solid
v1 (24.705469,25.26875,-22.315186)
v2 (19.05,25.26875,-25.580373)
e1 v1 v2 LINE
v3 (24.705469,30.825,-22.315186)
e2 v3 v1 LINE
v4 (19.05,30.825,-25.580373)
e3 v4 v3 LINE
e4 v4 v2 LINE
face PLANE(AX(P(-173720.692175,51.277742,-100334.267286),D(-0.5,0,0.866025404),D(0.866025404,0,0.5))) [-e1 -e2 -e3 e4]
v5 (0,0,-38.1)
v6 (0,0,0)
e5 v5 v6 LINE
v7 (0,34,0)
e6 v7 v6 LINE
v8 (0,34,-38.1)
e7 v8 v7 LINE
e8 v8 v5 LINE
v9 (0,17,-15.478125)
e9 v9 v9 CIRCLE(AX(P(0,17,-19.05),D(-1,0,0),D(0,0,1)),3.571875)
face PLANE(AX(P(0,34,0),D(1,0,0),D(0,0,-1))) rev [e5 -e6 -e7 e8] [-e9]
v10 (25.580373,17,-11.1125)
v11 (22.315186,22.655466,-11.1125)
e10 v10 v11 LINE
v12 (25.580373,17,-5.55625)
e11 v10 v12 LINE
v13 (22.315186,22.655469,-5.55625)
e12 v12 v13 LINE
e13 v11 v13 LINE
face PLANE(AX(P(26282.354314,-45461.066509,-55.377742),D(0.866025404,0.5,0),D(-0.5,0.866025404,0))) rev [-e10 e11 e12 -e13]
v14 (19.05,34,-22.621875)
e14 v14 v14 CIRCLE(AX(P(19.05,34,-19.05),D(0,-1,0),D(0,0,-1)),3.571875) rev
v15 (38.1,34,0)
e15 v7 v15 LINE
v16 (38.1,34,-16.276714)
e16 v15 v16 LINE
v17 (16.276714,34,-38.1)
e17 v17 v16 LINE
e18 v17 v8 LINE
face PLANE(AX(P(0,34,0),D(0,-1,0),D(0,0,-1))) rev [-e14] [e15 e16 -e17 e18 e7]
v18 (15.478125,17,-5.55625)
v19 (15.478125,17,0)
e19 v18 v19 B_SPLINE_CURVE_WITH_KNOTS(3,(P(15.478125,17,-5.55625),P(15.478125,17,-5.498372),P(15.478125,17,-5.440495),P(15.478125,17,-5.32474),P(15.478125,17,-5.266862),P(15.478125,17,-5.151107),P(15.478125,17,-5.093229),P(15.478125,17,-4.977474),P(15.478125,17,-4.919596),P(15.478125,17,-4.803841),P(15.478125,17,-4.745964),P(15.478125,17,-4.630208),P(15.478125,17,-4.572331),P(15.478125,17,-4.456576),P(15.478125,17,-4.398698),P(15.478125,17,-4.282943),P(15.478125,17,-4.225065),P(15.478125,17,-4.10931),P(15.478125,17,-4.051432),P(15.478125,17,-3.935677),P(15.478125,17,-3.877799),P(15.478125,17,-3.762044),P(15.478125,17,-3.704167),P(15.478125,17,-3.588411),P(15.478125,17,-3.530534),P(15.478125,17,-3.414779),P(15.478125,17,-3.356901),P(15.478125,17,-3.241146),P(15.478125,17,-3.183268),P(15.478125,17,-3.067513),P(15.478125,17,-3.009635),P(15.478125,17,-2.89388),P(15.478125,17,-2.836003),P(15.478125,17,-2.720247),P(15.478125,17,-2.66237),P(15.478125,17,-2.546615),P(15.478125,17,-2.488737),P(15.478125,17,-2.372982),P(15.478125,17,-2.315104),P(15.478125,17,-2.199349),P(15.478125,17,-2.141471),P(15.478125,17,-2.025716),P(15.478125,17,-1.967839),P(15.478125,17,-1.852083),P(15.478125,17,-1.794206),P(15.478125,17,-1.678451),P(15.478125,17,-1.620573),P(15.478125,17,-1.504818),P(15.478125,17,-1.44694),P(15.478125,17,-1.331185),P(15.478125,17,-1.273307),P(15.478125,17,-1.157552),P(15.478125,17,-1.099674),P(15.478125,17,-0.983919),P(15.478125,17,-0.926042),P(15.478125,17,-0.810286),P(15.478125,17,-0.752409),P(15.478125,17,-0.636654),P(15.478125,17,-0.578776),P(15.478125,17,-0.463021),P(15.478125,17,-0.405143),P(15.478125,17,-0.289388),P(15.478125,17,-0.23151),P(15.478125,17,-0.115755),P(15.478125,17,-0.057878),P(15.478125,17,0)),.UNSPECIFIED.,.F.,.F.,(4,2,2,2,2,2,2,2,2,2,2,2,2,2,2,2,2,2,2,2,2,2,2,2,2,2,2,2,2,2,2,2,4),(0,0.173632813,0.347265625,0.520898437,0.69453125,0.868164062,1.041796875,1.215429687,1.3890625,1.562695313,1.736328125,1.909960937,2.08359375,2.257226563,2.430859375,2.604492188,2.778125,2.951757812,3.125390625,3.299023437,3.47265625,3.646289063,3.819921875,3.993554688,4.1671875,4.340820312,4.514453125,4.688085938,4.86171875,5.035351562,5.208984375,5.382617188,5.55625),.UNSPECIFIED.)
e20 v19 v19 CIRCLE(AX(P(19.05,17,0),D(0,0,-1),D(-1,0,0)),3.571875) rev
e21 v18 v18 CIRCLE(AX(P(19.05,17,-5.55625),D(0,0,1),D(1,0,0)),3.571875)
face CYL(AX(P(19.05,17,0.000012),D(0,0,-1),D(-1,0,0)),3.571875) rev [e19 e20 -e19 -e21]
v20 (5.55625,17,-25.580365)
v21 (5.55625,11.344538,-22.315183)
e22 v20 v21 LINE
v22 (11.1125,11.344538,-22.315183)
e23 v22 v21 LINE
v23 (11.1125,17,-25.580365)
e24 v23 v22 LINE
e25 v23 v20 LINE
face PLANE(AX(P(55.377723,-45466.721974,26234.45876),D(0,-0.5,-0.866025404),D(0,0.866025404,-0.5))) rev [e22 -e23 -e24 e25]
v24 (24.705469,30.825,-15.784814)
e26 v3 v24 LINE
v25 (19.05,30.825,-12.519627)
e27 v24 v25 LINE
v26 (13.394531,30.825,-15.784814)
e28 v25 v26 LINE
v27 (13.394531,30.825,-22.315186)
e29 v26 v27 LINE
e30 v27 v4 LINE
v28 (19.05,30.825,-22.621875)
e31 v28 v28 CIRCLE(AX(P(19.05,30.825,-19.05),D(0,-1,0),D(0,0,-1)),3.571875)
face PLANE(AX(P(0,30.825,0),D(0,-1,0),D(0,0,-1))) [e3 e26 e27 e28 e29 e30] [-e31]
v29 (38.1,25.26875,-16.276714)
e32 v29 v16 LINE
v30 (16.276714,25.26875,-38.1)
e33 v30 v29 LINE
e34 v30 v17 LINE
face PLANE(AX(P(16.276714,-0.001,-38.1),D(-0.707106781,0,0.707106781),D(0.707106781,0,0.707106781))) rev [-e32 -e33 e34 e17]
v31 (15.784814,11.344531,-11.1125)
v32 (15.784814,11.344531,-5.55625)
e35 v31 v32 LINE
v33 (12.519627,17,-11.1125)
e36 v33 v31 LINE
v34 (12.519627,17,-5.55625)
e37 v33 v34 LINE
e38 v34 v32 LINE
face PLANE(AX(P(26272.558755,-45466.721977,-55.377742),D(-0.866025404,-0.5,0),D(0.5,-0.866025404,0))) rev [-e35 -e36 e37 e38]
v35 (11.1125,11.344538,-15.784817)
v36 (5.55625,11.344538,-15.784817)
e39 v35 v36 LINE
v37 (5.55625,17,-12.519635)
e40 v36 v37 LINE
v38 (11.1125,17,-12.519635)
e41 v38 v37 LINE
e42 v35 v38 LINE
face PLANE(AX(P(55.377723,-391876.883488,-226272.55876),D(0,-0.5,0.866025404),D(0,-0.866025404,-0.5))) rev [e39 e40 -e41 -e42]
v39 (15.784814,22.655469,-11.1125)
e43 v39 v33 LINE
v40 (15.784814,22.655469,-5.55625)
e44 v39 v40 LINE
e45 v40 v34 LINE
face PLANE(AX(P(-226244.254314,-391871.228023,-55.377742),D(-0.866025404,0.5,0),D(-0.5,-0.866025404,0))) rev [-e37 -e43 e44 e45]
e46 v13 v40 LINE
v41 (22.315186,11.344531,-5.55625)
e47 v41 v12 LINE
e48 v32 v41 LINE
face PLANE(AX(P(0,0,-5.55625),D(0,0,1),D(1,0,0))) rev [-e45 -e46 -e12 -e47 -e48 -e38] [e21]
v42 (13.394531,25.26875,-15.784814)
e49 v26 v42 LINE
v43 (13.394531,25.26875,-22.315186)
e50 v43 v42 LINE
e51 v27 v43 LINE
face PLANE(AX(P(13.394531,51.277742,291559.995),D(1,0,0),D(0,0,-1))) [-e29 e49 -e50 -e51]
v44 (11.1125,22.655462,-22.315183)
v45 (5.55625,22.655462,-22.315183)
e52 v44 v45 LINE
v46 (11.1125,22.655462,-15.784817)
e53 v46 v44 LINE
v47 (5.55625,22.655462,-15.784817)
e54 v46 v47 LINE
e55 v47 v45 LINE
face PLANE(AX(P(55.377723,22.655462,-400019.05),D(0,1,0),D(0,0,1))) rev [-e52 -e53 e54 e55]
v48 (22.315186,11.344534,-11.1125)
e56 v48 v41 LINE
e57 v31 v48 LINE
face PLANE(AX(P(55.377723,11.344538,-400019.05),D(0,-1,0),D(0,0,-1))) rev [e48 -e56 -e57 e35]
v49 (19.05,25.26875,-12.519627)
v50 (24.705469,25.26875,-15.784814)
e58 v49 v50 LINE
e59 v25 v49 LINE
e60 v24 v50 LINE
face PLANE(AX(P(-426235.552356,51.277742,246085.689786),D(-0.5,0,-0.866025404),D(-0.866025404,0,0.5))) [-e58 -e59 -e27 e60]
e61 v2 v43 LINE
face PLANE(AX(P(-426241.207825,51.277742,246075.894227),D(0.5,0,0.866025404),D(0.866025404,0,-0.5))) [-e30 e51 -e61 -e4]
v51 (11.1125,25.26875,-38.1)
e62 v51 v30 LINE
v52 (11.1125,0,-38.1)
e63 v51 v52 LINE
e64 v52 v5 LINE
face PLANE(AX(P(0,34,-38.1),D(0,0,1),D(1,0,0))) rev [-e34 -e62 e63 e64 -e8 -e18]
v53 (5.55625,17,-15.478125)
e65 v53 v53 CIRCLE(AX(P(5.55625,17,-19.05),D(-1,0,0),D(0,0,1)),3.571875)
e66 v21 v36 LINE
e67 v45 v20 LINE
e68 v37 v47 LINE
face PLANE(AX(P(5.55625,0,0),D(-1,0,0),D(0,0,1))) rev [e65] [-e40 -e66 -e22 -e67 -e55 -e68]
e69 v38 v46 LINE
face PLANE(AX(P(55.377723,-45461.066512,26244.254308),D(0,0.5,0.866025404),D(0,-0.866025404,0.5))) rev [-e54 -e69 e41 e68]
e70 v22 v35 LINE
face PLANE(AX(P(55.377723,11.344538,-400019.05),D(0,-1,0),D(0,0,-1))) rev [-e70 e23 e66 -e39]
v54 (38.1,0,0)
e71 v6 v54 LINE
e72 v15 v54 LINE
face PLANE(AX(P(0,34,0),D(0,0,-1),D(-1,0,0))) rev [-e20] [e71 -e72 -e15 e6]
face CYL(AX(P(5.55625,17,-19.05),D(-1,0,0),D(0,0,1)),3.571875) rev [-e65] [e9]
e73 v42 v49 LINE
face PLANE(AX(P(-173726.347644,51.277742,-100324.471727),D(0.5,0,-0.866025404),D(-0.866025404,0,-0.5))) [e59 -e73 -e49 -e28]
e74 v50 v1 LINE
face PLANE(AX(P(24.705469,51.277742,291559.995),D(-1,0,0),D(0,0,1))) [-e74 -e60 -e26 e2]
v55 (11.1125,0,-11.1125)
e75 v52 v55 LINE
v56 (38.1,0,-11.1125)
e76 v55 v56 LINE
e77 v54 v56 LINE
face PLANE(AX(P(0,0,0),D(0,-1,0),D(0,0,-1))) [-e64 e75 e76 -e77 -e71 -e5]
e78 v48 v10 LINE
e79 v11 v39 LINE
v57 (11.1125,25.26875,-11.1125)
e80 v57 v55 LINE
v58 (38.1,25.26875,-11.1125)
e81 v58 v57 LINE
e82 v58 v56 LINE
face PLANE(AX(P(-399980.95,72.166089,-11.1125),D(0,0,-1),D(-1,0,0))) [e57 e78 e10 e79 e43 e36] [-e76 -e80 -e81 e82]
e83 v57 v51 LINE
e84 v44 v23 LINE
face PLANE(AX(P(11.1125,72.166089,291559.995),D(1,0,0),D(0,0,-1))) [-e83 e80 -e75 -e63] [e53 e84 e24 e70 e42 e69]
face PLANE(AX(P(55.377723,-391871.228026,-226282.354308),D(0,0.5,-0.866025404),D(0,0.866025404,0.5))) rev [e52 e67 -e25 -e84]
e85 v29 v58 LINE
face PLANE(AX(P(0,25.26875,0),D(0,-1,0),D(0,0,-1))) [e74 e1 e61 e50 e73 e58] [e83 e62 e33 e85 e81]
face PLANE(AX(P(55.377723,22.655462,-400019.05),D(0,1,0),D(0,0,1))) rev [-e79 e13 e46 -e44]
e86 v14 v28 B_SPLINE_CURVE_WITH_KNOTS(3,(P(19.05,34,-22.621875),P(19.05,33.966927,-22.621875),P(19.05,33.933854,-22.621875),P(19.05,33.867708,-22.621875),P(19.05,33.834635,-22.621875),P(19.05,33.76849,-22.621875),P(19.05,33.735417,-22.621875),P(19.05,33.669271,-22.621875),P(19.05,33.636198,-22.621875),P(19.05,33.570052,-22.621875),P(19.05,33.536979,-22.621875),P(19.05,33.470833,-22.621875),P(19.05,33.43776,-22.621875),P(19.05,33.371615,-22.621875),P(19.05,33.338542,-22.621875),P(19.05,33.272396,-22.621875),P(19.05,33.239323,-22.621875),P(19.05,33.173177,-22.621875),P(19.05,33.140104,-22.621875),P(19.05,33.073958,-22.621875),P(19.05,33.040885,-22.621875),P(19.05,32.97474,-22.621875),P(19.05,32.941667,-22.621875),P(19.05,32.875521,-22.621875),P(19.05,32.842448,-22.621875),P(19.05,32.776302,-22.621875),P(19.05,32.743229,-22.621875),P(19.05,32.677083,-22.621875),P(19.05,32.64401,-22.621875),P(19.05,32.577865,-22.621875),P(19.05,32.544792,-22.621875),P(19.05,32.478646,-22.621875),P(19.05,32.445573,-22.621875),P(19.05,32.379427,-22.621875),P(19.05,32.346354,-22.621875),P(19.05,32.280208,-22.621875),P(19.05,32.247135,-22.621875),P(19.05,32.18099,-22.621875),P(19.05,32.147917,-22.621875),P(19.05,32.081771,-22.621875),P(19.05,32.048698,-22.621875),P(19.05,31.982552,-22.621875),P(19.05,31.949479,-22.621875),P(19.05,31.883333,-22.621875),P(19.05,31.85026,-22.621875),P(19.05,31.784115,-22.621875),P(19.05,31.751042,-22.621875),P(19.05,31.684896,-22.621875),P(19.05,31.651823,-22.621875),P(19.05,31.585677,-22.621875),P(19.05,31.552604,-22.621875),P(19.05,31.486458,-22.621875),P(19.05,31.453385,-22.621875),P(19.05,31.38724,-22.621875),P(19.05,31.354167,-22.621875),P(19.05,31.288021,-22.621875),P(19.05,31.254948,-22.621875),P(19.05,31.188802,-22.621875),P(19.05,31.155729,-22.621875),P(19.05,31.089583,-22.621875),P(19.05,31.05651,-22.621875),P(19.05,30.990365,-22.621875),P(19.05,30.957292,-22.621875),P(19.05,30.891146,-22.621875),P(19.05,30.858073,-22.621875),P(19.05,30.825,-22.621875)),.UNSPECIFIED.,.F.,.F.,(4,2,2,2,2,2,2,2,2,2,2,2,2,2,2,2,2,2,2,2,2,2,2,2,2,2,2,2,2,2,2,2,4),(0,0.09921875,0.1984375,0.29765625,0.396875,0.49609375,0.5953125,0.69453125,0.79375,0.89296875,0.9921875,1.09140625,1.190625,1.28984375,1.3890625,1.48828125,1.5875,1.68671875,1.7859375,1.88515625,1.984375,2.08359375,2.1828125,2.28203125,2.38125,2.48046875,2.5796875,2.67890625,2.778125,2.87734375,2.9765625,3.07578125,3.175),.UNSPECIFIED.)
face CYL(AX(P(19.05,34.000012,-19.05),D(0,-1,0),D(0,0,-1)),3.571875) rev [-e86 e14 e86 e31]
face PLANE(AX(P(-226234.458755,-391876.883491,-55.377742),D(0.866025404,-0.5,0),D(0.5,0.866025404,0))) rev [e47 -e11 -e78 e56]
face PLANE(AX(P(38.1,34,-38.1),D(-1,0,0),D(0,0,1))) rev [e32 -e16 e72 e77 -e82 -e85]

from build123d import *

# Parameters (mm, degrees)
SKETCH1_W                    = 38.1
SKETCH1_H                    = 38.1
MAIN_BODY_DEPTH              = 34
F_9_32_RIGHT_RAIL_DEPTH      = 64.712008287
F_9_32_RIGHT_RAIL_DEPTH_BACK = 5.55625
SKETCH3_R                    = 3.571875
SKETCH4_R                    = 3.571875
F_9_32_LEFT_RAIL_DEPTH       = 5.55625
F_9_32_TOPPER_DEPTH          = 64.712008287
F_9_32_TOPPER_DEPTH_BACK     = 10
SKETCH8_R                    = 3.571875
HEX_START                    = -5.55625
HEX_HOLE_RIGHT_DEPTH         = 32.54375
HEX_HOLE_LEFT_DEPTH          = 32.54375
INNER_START                  = -34
INNER_CAVITY_OUTLINE_W       = 26.9875
INNER_CAVITY_OUTLINE_H       = 26.9875
INNER_CAVITY_DEPTH           = 25.26875
HEX_START_2                  = -17
HEX_HOLE_TOP_DEPTH           = 13.825
TOP_CORNER_REACH             = 65.712


# Read off the part's stored shape, not the designer's step: Inner Cavity
with BuildPart() as part:
    # Sketch1 → Main Body (new body)
    with BuildSketch(Plane(origin=(0, 0, 0), x_dir=(1, 0, 0), z_dir=(0, 1, 0))):
        with Locations((19.05, 19.05)):
            Rectangle(SKETCH1_W, SKETCH1_H)
    extrude(amount=MAIN_BODY_DEPTH)

    # Sketch3 → 9/32 Right Rail (cut, two sides: drawn at the far end of the back side and taken through both)
    with BuildSketch(Plane.XY.offset(-F_9_32_RIGHT_RAIL_DEPTH_BACK)):
        with Locations(Location((19.05, 17, 0), (0, 0, 180))):
            Circle(SKETCH3_R)
    extrude(amount=F_9_32_RIGHT_RAIL_DEPTH + F_9_32_RIGHT_RAIL_DEPTH_BACK, mode=Mode.SUBTRACT)

    # Sketch4 → 9/32 Left Rail (cut)
    with BuildSketch(Plane.ZY):
        with Locations((-19.05, 17)):
            Circle(SKETCH4_R)
    extrude(amount=-F_9_32_LEFT_RAIL_DEPTH, mode=Mode.SUBTRACT)

    # Sketch8 → 9/32 Topper (cut, two sides: drawn at the far end of the back side and taken through both)
    with BuildSketch(Plane(origin=(0, 34, 0), x_dir=(1, 0, 0), z_dir=(0, 1, 0)).offset(-F_9_32_TOPPER_DEPTH_BACK)):
        with Locations(Location((19.05, 19.05, 0), (0, 0, 90))):
            Circle(SKETCH8_R)
    extrude(amount=F_9_32_TOPPER_DEPTH + F_9_32_TOPPER_DEPTH_BACK, mode=Mode.SUBTRACT)

    # Sketch9 → Hex Hole Right (cut)
    with BuildSketch(Plane.ZY.offset(HEX_START)):
        Polygon((-22.315182739, 22.6554624), (-25.580365478, 17), (-22.315182739, 11.3445376), (-15.784817261, 11.3445376), (-12.519634522, 17), (-15.784817261, 22.6554624), align=None)
    extrude(amount=-HEX_HOLE_RIGHT_DEPTH, mode=Mode.SUBTRACT)

    # Sketch10 → Hex Hole Left (cut)
    with BuildSketch(Plane.XY.offset(HEX_START)):
        Polygon((15.784813595, 22.65546875), (12.51962719, 17), (15.784813595, 11.34453125), (22.315186405, 11.34453125), (25.58037281, 17), (22.315186405, 22.65546875), align=None)
    extrude(amount=-HEX_HOLE_LEFT_DEPTH, mode=Mode.SUBTRACT)

    # Inner Cavity outline → Inner Cavity (cut)
    with BuildSketch(Plane(origin=(0, 34, 0), x_dir=(1, 0, 0), z_dir=(0, 1, 0)).offset(INNER_START)):
        with Locations((24.60625, 24.60625)):
            Rectangle(INNER_CAVITY_OUTLINE_W, INNER_CAVITY_OUTLINE_H)
    extrude(amount=INNER_CAVITY_DEPTH, mode=Mode.SUBTRACT)

    # Sketch14 → Hex Hole Top (cut)
    with BuildSketch(Plane(origin=(0, 34, 0), x_dir=(1, 0, 0), z_dir=(0, 1, 0)).offset(HEX_START_2)):
        Polygon((24.70546875, 22.315186405), (19.05, 25.58037281), (13.39453125, 22.315186405), (13.39453125, 15.784813595), (19.05, 12.51962719), (24.70546875, 15.784813595), align=None)
    extrude(amount=HEX_HOLE_TOP_DEPTH, mode=Mode.SUBTRACT)

    # Sketch16 → Top Corner (cut, up to next)
    with BuildSketch(Plane(origin=(0, 34, 0), x_dir=(1, 0, 0), z_dir=(0, 1, 0)), mode=Mode.PRIVATE) as top_corner_sk1:
        Polygon((38.1, 38.1), (16.276714219, 38.1), (38.1, 16.276714219), align=None)
    top_corner_tool1 = extrude(top_corner_sk1.sketch, amount=-TOP_CORNER_REACH, mode=Mode.PRIVATE) & part.part
    add(top_corner_tool1.solids().sort_by_distance((30.825571, 34, -30.825571))[0], mode=Mode.SUBTRACT)


solid = part.part
